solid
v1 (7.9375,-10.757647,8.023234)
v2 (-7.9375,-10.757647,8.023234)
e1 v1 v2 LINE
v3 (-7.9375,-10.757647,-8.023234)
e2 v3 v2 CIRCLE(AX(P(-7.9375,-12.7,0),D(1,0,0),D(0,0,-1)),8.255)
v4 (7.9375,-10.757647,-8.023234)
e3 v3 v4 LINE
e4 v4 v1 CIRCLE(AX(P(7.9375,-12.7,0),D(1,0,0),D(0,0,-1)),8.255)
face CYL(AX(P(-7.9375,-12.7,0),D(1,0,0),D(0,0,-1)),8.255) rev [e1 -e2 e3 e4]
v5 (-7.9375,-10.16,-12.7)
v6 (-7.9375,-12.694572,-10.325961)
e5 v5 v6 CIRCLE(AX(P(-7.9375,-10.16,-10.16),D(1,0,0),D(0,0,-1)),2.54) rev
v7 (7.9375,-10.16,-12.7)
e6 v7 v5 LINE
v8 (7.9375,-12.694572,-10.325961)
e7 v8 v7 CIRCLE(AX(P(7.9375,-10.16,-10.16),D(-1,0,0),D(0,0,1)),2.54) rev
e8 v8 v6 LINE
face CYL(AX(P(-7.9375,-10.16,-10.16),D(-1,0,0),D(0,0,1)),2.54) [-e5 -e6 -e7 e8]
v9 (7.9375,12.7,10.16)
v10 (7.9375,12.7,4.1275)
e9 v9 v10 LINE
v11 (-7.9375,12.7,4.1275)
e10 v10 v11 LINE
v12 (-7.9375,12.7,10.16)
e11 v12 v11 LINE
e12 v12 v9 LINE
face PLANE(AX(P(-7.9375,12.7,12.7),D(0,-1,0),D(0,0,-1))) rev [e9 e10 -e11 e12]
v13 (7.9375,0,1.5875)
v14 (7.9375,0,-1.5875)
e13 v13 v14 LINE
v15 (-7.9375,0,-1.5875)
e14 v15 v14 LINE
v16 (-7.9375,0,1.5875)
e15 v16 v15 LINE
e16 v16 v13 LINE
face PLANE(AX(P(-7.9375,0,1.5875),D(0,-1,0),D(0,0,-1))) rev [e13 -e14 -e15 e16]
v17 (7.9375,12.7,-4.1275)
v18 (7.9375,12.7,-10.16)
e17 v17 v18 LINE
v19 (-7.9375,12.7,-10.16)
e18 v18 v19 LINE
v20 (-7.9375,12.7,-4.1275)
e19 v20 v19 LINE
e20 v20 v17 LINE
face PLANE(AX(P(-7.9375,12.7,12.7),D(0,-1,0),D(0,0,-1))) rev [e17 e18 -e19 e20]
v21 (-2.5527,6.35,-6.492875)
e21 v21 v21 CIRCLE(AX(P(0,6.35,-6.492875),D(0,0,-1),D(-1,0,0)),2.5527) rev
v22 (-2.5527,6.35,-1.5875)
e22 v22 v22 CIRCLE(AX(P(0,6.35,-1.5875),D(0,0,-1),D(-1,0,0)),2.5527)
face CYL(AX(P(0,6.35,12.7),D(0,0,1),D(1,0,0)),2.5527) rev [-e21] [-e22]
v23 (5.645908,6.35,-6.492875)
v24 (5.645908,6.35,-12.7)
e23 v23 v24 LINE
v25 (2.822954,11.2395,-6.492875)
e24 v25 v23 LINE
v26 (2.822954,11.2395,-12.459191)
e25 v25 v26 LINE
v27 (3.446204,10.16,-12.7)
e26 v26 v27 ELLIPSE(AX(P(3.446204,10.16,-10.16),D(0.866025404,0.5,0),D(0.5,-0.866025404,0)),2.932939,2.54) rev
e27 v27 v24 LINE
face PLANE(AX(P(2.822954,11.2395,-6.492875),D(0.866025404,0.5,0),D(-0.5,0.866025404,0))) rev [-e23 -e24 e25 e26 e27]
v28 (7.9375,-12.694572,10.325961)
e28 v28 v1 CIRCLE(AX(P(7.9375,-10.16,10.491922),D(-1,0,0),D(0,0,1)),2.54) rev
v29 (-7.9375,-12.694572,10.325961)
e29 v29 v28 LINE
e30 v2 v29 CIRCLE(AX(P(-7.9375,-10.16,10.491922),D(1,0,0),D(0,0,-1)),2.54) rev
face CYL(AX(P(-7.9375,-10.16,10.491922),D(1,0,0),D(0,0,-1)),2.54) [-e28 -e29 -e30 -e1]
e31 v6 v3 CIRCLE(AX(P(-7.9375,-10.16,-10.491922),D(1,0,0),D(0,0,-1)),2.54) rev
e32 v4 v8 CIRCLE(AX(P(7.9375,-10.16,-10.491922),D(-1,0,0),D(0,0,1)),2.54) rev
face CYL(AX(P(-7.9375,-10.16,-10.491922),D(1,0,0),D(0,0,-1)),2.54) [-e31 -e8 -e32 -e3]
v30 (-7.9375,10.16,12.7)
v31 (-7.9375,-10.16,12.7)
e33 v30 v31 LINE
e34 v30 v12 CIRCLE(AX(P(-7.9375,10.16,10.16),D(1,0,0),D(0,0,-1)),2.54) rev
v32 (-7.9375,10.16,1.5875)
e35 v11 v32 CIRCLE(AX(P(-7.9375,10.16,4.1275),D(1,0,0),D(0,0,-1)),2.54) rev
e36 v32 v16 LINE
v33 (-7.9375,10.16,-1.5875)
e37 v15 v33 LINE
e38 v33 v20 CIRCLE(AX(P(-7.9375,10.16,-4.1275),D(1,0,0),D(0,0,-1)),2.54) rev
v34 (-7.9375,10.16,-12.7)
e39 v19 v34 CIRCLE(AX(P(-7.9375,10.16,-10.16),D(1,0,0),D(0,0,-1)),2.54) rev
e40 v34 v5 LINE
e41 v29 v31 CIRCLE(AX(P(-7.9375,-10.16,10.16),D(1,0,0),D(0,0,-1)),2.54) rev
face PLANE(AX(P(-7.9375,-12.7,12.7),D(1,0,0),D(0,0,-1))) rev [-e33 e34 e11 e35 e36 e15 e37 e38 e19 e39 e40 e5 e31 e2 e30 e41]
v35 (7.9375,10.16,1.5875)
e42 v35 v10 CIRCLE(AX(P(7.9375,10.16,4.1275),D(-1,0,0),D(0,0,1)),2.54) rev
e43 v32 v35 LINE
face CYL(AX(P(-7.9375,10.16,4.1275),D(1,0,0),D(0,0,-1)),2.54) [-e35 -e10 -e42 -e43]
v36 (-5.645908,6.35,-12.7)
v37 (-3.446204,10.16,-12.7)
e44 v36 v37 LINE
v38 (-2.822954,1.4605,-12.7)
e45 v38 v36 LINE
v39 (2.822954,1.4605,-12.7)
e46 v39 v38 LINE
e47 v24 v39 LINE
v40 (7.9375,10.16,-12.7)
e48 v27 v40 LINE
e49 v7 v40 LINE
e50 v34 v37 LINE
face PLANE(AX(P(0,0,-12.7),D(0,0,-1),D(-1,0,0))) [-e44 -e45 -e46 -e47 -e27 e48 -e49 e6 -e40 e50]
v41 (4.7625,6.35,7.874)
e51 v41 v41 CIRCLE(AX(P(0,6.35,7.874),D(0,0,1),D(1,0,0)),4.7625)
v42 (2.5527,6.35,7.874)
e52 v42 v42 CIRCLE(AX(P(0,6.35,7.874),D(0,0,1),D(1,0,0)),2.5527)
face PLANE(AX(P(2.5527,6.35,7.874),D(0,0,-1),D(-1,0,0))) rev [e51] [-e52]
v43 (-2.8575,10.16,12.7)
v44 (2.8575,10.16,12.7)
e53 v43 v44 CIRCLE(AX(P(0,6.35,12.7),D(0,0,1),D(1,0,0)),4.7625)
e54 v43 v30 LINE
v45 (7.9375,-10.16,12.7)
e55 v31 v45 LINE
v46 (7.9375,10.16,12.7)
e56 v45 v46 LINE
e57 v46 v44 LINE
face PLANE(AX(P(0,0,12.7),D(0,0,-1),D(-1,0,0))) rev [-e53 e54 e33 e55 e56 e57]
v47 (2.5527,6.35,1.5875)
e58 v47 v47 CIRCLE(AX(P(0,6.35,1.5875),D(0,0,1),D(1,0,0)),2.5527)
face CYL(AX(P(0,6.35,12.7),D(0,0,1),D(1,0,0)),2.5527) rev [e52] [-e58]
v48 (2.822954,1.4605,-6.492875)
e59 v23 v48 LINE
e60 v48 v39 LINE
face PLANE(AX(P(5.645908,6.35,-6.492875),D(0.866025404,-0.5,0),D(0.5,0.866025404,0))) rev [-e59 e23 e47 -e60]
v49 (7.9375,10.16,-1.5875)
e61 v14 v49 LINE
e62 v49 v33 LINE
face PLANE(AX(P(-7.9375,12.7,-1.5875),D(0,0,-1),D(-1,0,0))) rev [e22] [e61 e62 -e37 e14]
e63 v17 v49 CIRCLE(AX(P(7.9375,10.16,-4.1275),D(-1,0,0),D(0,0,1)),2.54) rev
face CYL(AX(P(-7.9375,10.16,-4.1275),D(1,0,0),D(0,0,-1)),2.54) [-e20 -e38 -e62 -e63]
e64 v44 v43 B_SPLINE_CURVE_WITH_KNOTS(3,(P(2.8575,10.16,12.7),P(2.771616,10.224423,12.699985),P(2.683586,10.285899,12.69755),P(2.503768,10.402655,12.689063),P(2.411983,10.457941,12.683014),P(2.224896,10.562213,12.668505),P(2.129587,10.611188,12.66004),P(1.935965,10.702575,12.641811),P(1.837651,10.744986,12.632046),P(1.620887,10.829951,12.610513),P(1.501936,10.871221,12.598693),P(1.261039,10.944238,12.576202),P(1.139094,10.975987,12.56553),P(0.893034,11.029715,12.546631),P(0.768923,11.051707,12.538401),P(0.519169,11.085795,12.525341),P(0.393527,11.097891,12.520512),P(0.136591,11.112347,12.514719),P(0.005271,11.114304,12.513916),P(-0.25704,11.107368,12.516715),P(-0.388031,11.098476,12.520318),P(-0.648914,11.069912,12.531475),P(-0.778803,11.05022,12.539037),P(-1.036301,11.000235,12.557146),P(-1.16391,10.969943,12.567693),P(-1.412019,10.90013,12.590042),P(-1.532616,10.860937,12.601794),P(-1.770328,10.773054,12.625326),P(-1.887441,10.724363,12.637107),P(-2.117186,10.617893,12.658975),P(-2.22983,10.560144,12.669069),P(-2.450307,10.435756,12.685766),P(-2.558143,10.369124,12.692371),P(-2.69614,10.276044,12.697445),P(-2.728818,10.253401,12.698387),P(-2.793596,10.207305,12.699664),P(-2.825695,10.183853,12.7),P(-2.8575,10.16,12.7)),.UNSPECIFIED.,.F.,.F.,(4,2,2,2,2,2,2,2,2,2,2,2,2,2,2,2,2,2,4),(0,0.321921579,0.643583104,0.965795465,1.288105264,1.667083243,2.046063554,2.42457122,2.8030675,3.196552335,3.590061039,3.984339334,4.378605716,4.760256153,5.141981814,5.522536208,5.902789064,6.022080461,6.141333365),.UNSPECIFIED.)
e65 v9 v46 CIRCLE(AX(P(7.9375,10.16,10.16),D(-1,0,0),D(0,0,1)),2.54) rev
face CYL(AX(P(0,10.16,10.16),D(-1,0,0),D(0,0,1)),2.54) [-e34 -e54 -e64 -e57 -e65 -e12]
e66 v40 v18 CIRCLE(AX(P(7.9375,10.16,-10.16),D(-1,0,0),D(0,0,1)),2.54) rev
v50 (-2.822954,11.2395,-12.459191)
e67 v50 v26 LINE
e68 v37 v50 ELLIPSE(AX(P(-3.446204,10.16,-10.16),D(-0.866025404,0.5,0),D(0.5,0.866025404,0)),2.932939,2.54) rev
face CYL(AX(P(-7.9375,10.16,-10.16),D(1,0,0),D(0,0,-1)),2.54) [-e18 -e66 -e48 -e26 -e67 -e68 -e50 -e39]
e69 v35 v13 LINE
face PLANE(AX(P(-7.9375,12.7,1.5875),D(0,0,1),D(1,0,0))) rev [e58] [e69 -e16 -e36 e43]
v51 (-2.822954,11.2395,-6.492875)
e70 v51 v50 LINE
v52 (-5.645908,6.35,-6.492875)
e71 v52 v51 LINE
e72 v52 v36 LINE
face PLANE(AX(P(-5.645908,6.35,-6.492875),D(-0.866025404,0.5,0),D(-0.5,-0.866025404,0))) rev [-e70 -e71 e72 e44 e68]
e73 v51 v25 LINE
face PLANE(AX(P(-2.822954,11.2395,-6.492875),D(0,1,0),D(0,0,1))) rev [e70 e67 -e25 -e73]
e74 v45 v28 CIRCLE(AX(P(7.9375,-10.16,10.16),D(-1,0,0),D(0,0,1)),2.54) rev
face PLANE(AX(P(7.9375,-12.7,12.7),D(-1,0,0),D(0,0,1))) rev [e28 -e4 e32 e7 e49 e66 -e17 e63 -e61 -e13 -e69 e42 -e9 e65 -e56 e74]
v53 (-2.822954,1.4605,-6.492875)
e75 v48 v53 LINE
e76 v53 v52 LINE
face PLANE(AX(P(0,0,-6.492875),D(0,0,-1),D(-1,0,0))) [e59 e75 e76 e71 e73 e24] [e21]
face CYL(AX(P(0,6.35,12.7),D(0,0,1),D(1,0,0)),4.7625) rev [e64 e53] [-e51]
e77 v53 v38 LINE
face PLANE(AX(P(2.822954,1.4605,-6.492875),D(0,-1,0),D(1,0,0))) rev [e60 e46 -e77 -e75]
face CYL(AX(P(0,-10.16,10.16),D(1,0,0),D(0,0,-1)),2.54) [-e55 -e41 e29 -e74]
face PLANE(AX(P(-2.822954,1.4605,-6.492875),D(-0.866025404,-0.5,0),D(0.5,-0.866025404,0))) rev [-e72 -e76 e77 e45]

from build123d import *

# Parameters (mm, degrees)
SKETCH1_W                                       = 15.875
SKETCH1_H                                       = 25.4
BOSS_EXTRUDE1_DEPTH                             = 12.7
SKETCH2_R                                       = 8.255
SKETCH2_W                                       = 3.175
SKETCH2_H                                       = 12.7
CUT_EXTRUDE1_DEPTH                              = 24.970724332
CBORE_FOR_10_SOCKET_HEAD_CAP_SCREW1_D           = 5.1054
CBORE_FOR_10_SOCKET_HEAD_CAP_SCREW1_CBORE_D     = 9.525
CBORE_FOR_10_SOCKET_HEAD_CAP_SCREW1_CBORE_DEPTH = 4.826
FILLET2_R                                       = 2.54
CUT_EXTRUDE2_DEPTH                              = 6.207125


with BuildPart() as part:
    # Sketch1 → Boss-Extrude1 (new, symmetric)
    with BuildSketch(Plane.XY):
        Rectangle(SKETCH1_W, SKETCH1_H)
    extrude(amount=BOSS_EXTRUDE1_DEPTH, both=True)

    # Sketch2 → Cut-Extrude1 (cut, through all)
    with BuildSketch(Plane(origin=(7.9375, 0, 0), x_dir=(0, 0, -1), z_dir=(1, 0, 0))):
        with Locations((0, -12.7)):
            Circle(SKETCH2_R)
        with Locations((0, 6.35)):
            Rectangle(SKETCH2_W, SKETCH2_H)
    extrude(amount=-CUT_EXTRUDE1_DEPTH, mode=Mode.SUBTRACT)

    # CBORE for #10 Socket Head Cap Screw1 (through all)
    with Locations(Plane.XY.offset(12.7)):
        with Locations((0, 6.35)):
            CounterBoreHole(CBORE_FOR_10_SOCKET_HEAD_CAP_SCREW1_D / 2, CBORE_FOR_10_SOCKET_HEAD_CAP_SCREW1_CBORE_D / 2, CBORE_FOR_10_SOCKET_HEAD_CAP_SCREW1_CBORE_DEPTH)

    # Fillet2
    # the kernel refuses this fillet: 2.54 mm, written as the material it takes off along each edge
    with BuildSketch(Plane(origin=(13.529804731, -12.7, -8.255), x_dir=(0, 0, -1), z_dir=(-1, 0, 0))) as fillet2_piece_1:
        with BuildLine():
            CenterArc((2.236921893, -2.54), FILLET2_R, 90, 76.391039369)
            ThreePointArc((-0.231765612, -1.942352941), (-0.058146187, -0.978065725), (0, 0))
            Line((0, 0), (2.236921893, 0))
        make_face()
    extrude(amount=27.059609463, mode=Mode.SUBTRACT)
    with BuildSketch(Plane(origin=(-13.529804731, -12.7, 8.255), x_dir=(0, 0.9929562463238144, -0.11848161412860811), z_dir=(1, 0, 0))) as fillet2_piece_2:
        with BuildLine():
            CenterArc((2.257074749, 2.522108866), FILLET2_R, 186.804480315, 76.391039369)
            Line((-0.265034117, 2.221165566), (0, 0))
            ThreePointArc((0, 0), (0.978065725, 0.058146187), (1.956131449, 0))
        make_face()
    extrude(amount=27.059609463, mode=Mode.SUBTRACT)
    with BuildSketch(Plane(origin=(14.2875, 12.7, 12.7), x_dir=(0, 0, -1), z_dir=(-1, 0, 0)), Plane(origin=(14.2875, 12.7, -12.7), x_dir=(0, -1, 0), z_dir=(-1, 0, 0)), Plane(origin=(14.2875, 12.7, -1.5875), x_dir=(0, 0, -1), z_dir=(-1, 0, 0)), Plane(origin=(14.2875, 12.7, 1.5875), x_dir=(0, -1, 0), z_dir=(-1, 0, 0))) as fillet2_piece_3:
        with BuildLine():
            CenterArc((FILLET2_R, FILLET2_R), FILLET2_R, 180, 90)
            Line((0, FILLET2_R), (0, 0))
            Line((0, 0), (FILLET2_R, 0))
        make_face()
    extrude(amount=28.575, mode=Mode.SUBTRACT)
    with BuildSketch(Plane(origin=(-14.2875, -12.7, 12.7), x_dir=(0, 1, 0), z_dir=(1, 0, 0)), Plane(origin=(-14.2875, -12.7, -12.7), x_dir=(0, 0, 1), z_dir=(1, 0, 0))) as fillet2_piece_4:
        with BuildLine():
            CenterArc((FILLET2_R, -FILLET2_R), FILLET2_R, 90, 90)
            Line((0, -FILLET2_R), (0, 0))
            Line((0, 0), (FILLET2_R, 0))
        make_face()
    extrude(amount=28.575, mode=Mode.SUBTRACT)

    # Sketch5 → Cut-Extrude2 (cut)
    with BuildSketch(Plane(origin=(0, 0, -12.7), x_dir=(-1, 0, 0), z_dir=(0, 0, -1))):
        Polygon((5.645908282, 6.35), (2.822954141, 11.2395), (-2.822954141, 11.2395), (-5.645908282, 6.35), (-2.822954141, 1.4605), (2.822954141, 1.4605), align=None)
    extrude(amount=-CUT_EXTRUDE2_DEPTH, mode=Mode.SUBTRACT)


solid = part.part
